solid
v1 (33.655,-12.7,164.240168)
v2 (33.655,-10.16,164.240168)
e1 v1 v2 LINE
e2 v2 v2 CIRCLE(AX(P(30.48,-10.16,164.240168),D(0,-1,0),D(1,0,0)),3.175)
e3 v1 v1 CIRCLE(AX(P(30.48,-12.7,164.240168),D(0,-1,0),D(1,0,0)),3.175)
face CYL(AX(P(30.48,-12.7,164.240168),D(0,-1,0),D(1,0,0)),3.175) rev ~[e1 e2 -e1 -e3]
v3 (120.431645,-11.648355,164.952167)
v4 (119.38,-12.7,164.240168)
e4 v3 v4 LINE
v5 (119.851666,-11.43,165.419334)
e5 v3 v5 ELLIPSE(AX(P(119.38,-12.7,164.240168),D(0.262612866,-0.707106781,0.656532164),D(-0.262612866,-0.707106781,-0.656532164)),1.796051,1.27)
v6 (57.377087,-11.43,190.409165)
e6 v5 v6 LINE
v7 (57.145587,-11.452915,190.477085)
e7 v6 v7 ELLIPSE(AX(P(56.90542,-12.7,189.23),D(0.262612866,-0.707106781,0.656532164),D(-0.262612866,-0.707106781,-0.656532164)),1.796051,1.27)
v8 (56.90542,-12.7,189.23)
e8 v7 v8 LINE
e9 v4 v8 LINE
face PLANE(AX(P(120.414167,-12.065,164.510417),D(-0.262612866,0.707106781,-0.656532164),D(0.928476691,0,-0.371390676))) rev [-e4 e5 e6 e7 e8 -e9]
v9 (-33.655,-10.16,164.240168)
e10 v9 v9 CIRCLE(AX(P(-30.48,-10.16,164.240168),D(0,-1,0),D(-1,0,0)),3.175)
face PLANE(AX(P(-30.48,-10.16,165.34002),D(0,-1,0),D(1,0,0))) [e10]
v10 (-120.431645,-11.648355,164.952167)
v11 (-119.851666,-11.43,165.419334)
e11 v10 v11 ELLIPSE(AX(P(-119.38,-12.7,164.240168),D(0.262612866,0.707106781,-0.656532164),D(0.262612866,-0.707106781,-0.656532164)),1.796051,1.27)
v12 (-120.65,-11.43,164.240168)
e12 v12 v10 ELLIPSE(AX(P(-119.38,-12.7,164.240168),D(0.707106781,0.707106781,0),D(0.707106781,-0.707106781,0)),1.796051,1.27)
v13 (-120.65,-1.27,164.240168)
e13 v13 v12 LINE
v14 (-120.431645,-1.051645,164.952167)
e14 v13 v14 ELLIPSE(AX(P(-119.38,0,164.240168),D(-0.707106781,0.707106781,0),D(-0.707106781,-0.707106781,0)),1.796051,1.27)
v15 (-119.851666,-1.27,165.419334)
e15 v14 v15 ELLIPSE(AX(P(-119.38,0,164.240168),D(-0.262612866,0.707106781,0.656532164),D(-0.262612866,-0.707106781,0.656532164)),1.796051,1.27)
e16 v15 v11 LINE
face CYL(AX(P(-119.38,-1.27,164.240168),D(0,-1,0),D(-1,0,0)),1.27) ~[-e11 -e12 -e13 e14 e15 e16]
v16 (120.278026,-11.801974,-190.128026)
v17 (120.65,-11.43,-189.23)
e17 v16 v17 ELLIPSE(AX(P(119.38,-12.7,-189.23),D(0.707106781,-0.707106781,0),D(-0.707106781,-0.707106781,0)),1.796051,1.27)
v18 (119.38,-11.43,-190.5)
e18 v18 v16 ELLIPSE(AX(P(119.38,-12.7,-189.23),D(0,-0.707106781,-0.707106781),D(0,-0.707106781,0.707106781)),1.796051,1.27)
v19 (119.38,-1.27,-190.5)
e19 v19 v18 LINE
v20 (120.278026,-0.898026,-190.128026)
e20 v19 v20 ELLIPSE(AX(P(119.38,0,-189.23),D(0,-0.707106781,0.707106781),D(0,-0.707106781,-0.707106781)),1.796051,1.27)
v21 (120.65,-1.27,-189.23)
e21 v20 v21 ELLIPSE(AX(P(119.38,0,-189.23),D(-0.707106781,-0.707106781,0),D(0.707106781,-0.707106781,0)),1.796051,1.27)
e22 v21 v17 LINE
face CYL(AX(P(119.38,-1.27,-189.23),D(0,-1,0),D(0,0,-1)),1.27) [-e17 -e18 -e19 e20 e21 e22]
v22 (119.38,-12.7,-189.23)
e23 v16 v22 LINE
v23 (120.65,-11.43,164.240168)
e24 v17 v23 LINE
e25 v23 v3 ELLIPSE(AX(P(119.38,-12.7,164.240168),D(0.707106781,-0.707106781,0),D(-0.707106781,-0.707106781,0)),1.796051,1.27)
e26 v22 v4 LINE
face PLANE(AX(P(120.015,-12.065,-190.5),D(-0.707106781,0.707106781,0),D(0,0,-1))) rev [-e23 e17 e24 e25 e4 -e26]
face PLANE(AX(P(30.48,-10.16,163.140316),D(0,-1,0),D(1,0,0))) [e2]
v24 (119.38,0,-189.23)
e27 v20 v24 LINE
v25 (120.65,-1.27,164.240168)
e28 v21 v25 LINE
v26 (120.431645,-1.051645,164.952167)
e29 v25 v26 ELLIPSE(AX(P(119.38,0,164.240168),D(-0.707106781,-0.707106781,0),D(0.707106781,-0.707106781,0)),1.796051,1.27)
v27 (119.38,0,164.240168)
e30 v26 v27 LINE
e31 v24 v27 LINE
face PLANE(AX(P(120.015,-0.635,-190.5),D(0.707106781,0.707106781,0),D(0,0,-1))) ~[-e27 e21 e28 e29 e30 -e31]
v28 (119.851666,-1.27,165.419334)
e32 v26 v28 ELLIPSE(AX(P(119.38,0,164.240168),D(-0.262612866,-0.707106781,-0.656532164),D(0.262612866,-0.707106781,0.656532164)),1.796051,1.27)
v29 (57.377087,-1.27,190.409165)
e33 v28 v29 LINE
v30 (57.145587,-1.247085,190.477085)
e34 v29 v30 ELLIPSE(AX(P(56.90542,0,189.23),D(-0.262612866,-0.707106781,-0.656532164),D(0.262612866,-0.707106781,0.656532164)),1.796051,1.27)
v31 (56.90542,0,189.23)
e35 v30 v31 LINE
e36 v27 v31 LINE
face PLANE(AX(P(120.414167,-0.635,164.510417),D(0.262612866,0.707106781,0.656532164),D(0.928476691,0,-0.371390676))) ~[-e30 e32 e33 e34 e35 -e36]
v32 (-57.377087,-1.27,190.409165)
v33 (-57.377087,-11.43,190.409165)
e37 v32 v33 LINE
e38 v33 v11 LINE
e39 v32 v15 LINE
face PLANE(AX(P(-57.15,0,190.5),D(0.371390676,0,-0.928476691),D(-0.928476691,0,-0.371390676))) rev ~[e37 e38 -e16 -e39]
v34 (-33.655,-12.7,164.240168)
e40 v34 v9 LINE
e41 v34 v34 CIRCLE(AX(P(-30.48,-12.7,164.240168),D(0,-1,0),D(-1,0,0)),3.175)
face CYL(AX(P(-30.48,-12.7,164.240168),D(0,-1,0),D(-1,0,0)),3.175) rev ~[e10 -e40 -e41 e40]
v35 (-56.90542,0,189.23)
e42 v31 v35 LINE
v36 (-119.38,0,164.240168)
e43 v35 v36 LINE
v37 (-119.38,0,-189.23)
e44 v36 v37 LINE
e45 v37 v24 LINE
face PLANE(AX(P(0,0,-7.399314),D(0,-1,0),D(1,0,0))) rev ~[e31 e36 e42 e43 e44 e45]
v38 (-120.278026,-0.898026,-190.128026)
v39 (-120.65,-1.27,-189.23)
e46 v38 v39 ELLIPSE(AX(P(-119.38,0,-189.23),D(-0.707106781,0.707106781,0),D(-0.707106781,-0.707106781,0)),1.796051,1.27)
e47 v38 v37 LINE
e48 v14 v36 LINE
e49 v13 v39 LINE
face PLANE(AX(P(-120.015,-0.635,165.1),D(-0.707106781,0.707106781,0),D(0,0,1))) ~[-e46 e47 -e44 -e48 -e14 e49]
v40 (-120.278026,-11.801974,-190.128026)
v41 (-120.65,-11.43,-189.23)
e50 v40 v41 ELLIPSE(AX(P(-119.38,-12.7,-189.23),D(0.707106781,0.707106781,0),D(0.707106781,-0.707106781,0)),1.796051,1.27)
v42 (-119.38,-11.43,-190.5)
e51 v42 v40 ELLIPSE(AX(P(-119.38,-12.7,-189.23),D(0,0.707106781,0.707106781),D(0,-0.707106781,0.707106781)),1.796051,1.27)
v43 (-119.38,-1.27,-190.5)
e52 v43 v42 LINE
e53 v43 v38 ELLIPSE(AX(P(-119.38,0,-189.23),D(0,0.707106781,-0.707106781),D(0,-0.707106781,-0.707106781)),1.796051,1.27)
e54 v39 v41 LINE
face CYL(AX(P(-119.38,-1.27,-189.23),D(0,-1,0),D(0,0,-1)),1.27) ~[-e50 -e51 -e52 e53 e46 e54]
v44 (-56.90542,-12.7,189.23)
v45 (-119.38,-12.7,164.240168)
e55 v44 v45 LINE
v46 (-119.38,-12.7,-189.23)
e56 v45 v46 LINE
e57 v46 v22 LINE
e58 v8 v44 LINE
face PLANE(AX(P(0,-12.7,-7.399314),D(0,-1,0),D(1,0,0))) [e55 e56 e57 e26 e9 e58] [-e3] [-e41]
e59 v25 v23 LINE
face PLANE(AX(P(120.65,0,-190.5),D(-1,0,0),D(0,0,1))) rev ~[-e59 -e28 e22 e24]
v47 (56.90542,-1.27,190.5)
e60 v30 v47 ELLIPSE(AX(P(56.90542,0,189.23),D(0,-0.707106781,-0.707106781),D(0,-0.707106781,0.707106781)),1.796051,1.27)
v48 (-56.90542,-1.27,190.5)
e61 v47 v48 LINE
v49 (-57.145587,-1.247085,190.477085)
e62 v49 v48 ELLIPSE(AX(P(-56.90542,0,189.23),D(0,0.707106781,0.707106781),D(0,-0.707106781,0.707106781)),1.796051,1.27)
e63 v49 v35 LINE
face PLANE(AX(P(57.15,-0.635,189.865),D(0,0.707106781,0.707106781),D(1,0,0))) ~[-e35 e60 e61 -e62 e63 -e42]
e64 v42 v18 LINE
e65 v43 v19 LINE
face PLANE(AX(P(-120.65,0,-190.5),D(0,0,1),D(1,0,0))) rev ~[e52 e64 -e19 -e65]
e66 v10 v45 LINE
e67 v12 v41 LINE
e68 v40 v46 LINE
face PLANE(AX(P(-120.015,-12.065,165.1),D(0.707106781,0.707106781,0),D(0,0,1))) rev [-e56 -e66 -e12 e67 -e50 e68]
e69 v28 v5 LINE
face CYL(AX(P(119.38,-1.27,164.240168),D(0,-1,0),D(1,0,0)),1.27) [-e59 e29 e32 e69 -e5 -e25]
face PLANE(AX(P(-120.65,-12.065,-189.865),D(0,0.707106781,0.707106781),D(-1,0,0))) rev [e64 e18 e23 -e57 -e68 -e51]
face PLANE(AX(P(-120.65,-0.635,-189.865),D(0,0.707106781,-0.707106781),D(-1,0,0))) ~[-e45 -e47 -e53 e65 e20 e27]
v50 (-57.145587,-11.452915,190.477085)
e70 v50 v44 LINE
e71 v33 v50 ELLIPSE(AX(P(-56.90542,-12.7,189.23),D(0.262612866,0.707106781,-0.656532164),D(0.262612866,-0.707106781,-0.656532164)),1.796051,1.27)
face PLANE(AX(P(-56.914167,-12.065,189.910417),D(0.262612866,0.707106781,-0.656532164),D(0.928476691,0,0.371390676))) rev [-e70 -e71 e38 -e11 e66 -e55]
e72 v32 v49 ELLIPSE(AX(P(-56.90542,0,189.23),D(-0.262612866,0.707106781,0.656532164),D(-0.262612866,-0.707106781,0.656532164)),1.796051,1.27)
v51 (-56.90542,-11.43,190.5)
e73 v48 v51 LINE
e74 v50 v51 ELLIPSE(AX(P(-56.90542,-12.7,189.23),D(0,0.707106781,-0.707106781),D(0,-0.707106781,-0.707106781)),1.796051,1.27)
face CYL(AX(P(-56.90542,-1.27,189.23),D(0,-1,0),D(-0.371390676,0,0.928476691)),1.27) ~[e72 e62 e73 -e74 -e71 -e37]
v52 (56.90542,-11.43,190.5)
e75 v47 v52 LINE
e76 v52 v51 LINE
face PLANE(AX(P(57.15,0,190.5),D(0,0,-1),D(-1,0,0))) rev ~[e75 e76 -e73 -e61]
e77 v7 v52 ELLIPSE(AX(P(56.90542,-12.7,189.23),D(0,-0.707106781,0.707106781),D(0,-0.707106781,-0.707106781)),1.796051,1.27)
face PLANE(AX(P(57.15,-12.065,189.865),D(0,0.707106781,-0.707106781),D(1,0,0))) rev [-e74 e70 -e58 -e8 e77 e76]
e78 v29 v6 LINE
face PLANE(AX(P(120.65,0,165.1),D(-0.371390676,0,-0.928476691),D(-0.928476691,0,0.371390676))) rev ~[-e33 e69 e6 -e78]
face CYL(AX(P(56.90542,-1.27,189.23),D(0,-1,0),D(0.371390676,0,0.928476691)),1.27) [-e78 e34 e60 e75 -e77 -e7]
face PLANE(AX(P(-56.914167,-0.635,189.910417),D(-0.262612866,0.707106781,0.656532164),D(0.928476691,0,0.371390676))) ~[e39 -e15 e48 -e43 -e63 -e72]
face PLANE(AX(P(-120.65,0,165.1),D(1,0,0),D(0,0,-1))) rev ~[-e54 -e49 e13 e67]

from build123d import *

# Parameters (mm, degrees)
F1_DEPTH = 12.7
F2_SIZE  = 1.27
F3_R     = 1.27
F5_DEPTH = 2.54


with BuildPart() as f1:
    # F0 (on Front) → F1 (new body)
    with BuildSketch(Plane.XZ):
        Polygon((-120.65, -190.5), (120.65, -190.5), (120.65, 165.1), (57.15, 190.5), (-57.15, 190.5), (-120.65, 165.1), align=None)
    extrude(amount=F1_DEPTH)

    # F2
    f2_edges = [f1.edges().sort_by_distance(p)[0] for p in [
        (-88.9, -12.7, 177.8),
        (0, -12.7, 190.5),
        (88.9, -12.7, 177.8),
        (120.65, -12.7, -12.7),
        (0, -12.7, -190.5),
        (-120.65, -12.7, -12.7),
        (120.65, 0, -12.7),
        (0, 0, -190.5),
        (-120.65, 0, -12.7),
        (-88.9, 0, 177.8),
        (0, 0, 190.5),
        (88.9, 0, 177.8),
    ]]
    chamfer(f2_edges, length=F2_SIZE)

    # F3
    f3_edges = [f1.edges().sort_by_distance(p)[0] for p in [
        (-120.65, -6.35, 165.1),
        (-57.15, -6.35, 190.5),
        (57.15, -6.35, 190.5),
        (120.65, -6.35, 165.1),
        (120.65, -6.35, -190.5),
        (-120.65, -6.35, -190.5),
    ]]
    fillet(f3_edges, radius=F3_R)

    # F4 (on face) → F5 (cut)
    with BuildSketch(Plane.XZ.offset(12.7)):
        with BuildLine():
            ThreePointArc((27.305, 164.240168139), (30.48, 161.065168139), (33.655, 164.240168139))
            Line((33.655, 164.240168139), (27.305, 164.240168139))
        make_face()
        with BuildLine():
            Line((27.305, 164.240168139), (33.655, 164.240168139))
            ThreePointArc((33.655, 164.240168139), (30.48, 167.415168139), (27.305, 164.240168139))
        make_face()
        with BuildLine():
            Line((-33.655, 164.240168139), (-27.305, 164.240168139))
            ThreePointArc((-27.305, 164.240168139), (-30.48, 167.415168139), (-33.655, 164.240168139))
        make_face()
        with BuildLine():
            ThreePointArc((-33.655, 164.240168139), (-30.48, 161.065168139), (-27.305, 164.240168139))
            Line((-27.305, 164.240168139), (-33.655, 164.240168139))
        make_face()
    extrude(amount=-F5_DEPTH, mode=Mode.SUBTRACT)


solid = f1.part
